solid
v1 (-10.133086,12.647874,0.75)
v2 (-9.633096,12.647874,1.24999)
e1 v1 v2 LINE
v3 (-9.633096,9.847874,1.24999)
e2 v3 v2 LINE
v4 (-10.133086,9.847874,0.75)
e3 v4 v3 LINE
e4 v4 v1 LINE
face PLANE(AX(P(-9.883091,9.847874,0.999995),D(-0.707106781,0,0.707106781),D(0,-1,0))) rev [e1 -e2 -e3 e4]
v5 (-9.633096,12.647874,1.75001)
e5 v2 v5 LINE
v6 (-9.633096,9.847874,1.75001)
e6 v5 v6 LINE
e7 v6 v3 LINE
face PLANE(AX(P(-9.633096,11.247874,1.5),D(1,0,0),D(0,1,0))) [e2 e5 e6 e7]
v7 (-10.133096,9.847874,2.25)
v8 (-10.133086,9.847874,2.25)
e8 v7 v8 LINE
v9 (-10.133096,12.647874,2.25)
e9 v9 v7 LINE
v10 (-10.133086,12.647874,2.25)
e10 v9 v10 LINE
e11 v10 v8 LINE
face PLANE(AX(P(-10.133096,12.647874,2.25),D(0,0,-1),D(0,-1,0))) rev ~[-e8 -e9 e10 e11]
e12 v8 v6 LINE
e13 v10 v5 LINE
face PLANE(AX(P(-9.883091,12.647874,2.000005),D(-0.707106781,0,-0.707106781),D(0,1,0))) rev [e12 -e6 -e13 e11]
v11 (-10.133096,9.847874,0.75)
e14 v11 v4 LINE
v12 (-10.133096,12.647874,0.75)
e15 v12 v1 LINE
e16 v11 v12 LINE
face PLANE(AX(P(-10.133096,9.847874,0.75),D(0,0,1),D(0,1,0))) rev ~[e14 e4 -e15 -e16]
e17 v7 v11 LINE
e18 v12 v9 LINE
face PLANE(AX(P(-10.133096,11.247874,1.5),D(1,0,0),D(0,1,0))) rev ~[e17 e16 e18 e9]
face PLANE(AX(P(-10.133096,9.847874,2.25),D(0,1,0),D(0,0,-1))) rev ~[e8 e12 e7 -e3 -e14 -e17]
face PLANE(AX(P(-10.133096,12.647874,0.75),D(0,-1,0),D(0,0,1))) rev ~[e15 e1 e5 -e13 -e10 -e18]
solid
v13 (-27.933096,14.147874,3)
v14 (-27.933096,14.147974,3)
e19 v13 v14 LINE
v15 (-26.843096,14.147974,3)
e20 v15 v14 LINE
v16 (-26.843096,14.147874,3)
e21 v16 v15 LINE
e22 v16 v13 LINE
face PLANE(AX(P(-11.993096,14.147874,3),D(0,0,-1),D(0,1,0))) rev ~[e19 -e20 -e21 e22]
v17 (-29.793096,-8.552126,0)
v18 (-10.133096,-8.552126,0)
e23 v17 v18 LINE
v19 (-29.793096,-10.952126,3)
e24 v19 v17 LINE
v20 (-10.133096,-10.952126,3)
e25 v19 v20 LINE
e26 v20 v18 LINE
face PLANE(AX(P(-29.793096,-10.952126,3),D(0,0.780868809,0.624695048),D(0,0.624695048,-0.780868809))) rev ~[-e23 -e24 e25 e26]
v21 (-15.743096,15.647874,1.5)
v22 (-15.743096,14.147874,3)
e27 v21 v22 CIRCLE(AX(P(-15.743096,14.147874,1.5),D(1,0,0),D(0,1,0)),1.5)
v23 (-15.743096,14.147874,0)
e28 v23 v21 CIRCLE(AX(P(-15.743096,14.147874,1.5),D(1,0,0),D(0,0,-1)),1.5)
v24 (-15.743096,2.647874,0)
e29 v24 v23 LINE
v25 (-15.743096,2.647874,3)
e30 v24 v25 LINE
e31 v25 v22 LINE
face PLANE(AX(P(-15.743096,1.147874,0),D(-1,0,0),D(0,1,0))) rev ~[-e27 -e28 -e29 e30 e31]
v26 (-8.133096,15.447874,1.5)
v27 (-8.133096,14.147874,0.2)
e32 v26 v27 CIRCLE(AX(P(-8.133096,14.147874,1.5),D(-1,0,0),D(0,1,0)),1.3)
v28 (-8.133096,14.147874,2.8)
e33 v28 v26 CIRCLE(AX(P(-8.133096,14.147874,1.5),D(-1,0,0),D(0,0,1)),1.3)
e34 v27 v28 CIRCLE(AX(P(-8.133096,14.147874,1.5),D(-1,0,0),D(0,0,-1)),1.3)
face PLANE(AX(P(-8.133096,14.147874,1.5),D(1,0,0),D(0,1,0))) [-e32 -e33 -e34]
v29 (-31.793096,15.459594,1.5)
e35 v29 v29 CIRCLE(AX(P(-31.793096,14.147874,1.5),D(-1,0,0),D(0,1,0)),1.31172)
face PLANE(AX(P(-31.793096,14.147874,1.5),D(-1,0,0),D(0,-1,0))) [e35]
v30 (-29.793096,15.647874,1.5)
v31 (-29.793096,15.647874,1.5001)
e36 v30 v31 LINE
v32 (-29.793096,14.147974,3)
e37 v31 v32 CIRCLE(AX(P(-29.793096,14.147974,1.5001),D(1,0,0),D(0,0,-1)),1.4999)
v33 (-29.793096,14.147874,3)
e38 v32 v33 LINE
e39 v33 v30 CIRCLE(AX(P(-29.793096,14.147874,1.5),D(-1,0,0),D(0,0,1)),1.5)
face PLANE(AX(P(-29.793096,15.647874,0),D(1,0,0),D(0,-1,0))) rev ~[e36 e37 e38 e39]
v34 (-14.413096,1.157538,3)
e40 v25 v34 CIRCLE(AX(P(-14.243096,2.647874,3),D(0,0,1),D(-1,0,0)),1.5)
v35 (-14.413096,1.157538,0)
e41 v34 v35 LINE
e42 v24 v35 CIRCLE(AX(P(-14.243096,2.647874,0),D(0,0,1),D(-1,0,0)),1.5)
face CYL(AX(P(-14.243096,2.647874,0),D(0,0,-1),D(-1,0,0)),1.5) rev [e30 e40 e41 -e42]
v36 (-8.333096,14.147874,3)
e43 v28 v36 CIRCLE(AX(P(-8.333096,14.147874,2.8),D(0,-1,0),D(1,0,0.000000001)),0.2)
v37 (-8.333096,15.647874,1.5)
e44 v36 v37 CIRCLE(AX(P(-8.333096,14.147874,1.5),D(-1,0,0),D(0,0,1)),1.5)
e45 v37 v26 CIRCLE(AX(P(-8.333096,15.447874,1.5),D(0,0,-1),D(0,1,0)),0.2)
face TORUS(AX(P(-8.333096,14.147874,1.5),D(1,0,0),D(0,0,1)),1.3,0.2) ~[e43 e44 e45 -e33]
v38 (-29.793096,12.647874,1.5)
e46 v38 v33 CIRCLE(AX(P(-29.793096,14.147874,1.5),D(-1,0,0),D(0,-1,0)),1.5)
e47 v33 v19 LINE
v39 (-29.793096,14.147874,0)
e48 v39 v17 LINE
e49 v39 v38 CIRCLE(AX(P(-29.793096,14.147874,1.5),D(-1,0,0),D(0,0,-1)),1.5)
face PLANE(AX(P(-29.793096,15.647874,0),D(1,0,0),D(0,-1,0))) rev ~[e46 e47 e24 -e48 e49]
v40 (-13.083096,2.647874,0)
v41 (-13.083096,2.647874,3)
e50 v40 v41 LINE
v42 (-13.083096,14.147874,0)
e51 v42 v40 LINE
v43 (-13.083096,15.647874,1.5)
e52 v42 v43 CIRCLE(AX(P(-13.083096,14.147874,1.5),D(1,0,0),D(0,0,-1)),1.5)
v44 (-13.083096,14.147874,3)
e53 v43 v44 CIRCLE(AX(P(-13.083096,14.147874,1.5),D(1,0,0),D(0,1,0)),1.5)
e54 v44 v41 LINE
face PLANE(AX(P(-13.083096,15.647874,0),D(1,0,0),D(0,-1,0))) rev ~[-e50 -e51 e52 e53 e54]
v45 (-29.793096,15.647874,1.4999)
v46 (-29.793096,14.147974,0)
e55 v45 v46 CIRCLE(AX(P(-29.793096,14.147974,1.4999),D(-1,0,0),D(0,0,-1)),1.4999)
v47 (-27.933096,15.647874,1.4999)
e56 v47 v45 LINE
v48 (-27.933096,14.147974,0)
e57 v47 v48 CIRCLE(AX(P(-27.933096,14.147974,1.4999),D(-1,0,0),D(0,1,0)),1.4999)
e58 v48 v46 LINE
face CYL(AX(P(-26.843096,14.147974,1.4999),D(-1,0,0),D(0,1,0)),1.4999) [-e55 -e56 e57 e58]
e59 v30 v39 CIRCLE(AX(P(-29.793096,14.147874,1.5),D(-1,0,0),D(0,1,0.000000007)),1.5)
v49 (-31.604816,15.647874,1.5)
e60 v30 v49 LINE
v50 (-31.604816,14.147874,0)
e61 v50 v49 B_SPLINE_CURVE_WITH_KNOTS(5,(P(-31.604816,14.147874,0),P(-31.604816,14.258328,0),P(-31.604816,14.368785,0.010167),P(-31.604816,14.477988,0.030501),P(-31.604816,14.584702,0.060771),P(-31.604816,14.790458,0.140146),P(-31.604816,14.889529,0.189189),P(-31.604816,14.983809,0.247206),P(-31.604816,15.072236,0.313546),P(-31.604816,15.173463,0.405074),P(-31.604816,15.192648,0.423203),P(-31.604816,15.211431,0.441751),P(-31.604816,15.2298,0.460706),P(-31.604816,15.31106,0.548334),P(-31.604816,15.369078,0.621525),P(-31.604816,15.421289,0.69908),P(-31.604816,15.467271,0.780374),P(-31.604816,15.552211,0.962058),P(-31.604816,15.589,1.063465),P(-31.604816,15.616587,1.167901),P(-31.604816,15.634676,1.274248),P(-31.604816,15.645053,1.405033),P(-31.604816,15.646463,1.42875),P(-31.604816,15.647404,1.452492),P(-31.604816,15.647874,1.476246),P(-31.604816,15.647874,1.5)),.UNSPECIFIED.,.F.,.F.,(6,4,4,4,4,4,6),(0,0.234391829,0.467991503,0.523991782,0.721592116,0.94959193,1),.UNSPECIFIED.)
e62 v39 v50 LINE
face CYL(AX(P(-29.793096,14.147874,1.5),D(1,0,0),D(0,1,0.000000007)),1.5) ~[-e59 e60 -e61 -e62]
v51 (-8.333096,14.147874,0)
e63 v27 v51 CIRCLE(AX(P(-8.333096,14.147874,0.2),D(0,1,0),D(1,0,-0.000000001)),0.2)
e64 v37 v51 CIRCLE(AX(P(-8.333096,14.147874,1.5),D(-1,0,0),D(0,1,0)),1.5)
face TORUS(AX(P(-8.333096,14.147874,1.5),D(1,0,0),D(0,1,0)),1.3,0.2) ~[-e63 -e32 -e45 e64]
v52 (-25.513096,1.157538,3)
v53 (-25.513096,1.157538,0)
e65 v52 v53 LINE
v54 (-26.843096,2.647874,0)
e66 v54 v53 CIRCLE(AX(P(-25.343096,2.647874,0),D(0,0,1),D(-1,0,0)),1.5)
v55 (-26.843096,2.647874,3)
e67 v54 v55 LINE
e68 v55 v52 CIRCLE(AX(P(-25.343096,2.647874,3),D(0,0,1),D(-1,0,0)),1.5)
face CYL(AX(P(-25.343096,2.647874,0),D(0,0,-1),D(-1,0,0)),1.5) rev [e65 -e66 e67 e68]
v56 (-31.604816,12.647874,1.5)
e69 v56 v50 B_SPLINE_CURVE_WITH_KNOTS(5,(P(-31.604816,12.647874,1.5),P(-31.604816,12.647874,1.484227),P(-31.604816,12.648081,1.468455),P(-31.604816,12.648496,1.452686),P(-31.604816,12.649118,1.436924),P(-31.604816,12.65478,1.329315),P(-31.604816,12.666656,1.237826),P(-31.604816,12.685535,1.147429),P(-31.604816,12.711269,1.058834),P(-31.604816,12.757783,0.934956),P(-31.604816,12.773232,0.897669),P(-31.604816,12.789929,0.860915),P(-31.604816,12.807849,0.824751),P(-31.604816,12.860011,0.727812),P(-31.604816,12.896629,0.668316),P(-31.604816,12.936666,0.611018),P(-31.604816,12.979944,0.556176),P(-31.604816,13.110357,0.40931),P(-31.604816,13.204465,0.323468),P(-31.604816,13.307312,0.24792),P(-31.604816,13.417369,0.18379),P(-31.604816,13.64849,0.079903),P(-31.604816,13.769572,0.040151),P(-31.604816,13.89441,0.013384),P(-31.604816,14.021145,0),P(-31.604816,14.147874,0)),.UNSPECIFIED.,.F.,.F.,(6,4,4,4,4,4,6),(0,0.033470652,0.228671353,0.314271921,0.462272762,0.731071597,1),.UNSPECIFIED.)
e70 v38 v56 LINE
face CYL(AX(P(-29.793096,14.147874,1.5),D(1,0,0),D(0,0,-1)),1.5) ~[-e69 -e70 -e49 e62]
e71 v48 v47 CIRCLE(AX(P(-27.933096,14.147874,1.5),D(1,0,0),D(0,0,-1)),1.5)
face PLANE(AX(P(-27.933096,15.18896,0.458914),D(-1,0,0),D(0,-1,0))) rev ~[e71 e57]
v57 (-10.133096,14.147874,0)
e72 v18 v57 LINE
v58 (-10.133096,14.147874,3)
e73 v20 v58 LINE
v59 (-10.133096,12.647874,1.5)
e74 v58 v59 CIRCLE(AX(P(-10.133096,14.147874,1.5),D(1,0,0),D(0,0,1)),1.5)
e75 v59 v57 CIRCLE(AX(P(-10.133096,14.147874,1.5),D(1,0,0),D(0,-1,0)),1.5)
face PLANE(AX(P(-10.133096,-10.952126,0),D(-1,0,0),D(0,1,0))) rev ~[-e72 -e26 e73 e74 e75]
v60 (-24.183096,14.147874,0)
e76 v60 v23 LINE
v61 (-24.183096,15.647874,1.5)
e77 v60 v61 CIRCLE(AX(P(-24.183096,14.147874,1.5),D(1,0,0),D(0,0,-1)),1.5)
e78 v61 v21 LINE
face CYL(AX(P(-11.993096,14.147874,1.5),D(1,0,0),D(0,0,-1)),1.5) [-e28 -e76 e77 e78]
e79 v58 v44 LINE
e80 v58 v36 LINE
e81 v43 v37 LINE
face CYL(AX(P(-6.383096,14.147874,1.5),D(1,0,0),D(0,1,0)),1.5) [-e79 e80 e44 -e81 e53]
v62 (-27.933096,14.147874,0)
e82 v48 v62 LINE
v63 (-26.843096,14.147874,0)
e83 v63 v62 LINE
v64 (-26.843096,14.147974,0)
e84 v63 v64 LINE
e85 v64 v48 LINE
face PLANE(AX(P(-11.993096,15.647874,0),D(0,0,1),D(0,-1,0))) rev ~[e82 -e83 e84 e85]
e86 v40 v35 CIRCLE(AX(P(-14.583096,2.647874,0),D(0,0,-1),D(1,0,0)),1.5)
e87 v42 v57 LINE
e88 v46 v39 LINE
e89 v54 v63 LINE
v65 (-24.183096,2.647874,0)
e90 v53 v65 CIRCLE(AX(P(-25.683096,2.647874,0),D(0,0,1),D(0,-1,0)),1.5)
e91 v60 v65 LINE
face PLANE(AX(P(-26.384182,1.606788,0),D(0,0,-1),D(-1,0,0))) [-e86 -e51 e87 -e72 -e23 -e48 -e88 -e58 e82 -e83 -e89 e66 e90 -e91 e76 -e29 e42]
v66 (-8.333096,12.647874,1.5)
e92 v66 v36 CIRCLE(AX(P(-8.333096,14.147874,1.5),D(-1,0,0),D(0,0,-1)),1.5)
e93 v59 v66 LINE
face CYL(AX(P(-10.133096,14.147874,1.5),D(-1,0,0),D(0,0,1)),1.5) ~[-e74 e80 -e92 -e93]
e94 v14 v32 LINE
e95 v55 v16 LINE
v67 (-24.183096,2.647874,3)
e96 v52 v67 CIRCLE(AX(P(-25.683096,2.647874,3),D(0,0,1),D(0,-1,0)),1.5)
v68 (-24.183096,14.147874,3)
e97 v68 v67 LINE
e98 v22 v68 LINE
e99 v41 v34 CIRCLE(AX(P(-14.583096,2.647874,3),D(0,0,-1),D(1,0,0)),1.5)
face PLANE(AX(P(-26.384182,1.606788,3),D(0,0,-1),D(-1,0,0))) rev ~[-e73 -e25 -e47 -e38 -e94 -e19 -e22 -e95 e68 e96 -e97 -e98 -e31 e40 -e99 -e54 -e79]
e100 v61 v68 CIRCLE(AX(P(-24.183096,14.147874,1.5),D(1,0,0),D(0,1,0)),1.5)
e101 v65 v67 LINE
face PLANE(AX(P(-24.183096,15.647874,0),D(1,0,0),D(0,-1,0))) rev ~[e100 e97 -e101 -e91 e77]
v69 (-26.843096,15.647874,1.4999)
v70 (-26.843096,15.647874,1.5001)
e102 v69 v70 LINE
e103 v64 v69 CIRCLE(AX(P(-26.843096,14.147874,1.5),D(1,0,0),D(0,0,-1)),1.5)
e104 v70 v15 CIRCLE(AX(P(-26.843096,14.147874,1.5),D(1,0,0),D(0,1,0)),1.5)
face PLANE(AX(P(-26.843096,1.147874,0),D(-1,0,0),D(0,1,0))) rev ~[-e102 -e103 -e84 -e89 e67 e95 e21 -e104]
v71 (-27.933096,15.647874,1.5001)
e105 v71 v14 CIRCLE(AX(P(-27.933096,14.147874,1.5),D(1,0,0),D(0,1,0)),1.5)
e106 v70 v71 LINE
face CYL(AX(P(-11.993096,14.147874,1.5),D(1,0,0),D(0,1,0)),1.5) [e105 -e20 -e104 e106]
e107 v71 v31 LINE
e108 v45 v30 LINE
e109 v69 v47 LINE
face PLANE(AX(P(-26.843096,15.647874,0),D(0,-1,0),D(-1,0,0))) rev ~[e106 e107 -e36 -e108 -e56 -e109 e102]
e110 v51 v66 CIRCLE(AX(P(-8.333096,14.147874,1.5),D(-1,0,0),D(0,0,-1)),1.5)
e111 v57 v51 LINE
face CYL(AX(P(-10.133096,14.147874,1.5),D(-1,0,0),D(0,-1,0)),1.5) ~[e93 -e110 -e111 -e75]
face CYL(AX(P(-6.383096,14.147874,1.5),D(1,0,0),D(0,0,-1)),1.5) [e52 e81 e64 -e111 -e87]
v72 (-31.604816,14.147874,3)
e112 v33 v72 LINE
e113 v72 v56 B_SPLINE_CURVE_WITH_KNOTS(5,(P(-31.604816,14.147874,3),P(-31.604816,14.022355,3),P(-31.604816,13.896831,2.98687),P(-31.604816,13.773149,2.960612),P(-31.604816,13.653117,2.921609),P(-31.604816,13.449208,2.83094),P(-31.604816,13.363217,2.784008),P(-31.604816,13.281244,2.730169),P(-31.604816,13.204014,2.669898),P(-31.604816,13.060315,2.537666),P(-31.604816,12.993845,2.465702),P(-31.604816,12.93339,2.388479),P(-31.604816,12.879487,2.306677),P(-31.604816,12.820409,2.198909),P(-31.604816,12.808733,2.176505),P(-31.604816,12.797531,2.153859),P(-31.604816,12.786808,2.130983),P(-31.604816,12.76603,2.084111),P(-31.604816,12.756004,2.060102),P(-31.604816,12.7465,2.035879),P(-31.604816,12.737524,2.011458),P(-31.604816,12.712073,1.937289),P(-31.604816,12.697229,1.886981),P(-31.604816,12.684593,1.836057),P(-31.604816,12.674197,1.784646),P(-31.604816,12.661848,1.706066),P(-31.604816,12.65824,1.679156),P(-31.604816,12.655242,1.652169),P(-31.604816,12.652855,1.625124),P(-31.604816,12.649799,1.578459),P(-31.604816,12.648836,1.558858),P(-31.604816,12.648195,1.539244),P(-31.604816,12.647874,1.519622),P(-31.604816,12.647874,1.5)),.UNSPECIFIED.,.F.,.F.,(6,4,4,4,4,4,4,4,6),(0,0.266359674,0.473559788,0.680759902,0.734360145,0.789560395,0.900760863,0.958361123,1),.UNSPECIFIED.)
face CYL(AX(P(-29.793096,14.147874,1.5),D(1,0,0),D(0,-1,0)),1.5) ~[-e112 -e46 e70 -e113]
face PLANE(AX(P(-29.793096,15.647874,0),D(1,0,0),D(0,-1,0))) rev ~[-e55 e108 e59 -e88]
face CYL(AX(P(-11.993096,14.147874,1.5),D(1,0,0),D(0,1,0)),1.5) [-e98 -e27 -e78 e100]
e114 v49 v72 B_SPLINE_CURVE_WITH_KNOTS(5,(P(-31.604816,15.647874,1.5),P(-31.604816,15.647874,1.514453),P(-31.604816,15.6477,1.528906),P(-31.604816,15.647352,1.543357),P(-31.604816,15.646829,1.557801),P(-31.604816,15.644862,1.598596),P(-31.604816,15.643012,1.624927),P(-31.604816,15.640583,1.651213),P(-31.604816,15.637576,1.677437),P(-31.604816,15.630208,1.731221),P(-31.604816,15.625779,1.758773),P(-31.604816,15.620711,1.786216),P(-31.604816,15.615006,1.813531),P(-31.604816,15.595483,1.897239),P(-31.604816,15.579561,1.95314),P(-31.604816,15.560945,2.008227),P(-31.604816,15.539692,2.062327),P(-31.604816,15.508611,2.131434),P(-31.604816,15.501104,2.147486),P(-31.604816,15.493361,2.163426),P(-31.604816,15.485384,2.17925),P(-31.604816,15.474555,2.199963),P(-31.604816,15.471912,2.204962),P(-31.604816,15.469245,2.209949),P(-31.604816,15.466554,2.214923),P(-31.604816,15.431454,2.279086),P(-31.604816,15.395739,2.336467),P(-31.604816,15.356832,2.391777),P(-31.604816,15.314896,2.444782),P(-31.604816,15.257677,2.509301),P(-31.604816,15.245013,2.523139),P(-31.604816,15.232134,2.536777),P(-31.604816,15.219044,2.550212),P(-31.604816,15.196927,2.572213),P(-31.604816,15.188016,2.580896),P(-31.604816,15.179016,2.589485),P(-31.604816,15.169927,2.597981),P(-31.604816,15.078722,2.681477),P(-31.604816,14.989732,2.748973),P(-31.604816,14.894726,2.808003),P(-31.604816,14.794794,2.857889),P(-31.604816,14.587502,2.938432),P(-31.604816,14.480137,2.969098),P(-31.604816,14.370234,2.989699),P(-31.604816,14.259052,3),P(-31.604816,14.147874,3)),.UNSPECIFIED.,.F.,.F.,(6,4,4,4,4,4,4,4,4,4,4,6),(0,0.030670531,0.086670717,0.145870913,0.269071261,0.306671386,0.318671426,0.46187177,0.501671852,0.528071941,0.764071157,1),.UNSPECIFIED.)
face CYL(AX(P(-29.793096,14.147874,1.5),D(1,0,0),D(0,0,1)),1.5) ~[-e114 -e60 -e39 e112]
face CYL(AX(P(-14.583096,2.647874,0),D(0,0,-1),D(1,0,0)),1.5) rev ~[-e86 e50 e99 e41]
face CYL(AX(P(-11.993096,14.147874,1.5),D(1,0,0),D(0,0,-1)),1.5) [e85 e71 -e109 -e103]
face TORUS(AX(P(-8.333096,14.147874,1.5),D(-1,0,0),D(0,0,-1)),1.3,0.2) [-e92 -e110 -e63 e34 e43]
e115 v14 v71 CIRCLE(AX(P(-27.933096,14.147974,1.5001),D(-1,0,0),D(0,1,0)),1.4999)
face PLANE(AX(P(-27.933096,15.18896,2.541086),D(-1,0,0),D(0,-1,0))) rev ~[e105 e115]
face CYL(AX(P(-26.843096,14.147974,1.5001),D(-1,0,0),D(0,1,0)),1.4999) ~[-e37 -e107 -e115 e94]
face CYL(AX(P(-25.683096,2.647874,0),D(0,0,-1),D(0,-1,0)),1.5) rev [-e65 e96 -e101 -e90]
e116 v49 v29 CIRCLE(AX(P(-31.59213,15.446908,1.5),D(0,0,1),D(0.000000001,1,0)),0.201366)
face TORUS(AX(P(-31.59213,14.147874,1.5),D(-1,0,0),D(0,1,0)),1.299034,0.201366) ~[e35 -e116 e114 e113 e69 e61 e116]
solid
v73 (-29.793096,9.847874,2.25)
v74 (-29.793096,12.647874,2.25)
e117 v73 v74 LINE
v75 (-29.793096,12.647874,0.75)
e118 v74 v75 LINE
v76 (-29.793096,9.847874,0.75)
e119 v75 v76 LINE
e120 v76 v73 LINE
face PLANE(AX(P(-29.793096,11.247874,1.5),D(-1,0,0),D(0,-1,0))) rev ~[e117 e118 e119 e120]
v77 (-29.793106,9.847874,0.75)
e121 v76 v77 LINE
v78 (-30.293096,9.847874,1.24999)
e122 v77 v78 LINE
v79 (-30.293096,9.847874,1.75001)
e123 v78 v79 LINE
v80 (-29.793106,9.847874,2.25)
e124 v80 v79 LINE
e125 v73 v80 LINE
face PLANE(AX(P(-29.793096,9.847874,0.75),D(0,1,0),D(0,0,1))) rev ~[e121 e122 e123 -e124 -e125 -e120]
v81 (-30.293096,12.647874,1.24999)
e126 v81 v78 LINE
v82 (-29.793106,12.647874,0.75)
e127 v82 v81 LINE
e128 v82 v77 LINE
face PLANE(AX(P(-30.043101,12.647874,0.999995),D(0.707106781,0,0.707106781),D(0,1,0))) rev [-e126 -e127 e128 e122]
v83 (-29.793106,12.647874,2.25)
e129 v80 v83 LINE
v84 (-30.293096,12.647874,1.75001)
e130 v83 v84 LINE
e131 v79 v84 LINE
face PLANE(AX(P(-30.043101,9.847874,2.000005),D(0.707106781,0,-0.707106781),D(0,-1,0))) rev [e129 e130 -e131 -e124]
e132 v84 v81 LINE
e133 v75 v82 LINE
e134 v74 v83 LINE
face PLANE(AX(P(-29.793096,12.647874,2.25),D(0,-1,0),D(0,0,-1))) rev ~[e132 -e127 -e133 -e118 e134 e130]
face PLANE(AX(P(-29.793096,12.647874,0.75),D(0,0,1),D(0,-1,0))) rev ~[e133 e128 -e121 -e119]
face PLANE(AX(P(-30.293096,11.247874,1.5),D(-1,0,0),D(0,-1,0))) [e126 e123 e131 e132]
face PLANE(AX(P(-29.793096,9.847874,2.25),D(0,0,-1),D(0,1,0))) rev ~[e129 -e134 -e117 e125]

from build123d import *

# Parameters (mm, degrees)
F1_DEPTH      = 3
F3_DEPTH      = 2
F5_DEPTH      = 2
F6_DEPTH      = 0.5
F7_SIZE       = 0.49999
F8_DEPTH      = 0.5
F9_SIZE       = 0.49999
F10_DEPTH     = 19.66
F11_R         = 1.4999
F12_T3_DEPTH  = 3
F12_T6_DEPTH  = 3
F12_T9_DEPTH  = 3
F12_T12_DEPTH = 3
F12_T16_DEPTH = 15.94
F12_T19_DEPTH = 10.45
F12_T22_DEPTH = 15.94
F12_T25_DEPTH = 10.45
F14_T3_ANGLE  = 179.9999999988
F14_T6_ANGLE  = 90
F14_T9_ANGLE  = 90.0000000012


# Not quite as in the source:
# - a fillet or chamfer that OpenCascade refuses, or shapes differently, is made with other operations: its cross-section is extruded or revolved along the edge and cut away or added
# - two fillets or chamfers of one size are made in one step
# - a fillet or chamfer is up to 0.001 mm smaller than in the source, because OpenCascade refuses the exact size


with BuildPart() as f1:
    # F0 (on Top) → F1 (new body)
    with BuildSketch(Plane.XY):
        Polygon((-26.8430960169, 15.6478737652), (-29.7930960169, 15.6478737652), (-29.7930960169, -10.9521262348), (-10.1330960169, -10.9521262348), (-10.1330960169, 15.6478737652), (-13.0830960169, 15.6478737652), (-13.0830960169, 1.1478737652), (-15.7430960169, 1.1478737652), (-15.7430960169, 15.6478737652), (-24.1830960169, 15.6478737652), (-24.1830960169, 1.1478737652), (-26.8430960169, 1.1478737652), align=None)
    extrude(amount=F1_DEPTH)

    # F2 (on face) → F3 (join)
    with BuildSketch(Plane.YZ.offset(-10.1330960169)):
        with BuildLine():
            ThreePointArc((14.1478737652, 0), (15.208533937, 0.4393398282), (15.6478737652, 1.5))
            ThreePointArc((15.6478737652, 1.5), (15.208533937, 2.5606601718), (14.1478737652, 3))
            ThreePointArc((14.1478737652, 3), (13.0872135935, 2.5606601718), (12.6478737652, 1.5))
            ThreePointArc((12.6478737652, 1.5), (13.0872135935, 0.4393398282), (14.1478737652, 0))
        make_face()
    extrude(amount=F3_DEPTH)

    # F4 (on face) → F5 (join)
    with BuildSketch(Plane(origin=(-29.7930960169, 0, 0), x_dir=(0, -1, 0), z_dir=(-1, 0, 0))):
        with BuildLine():
            ThreePointArc((-14.1478737652, 0), (-13.0872135935, 0.4393398282), (-12.6478737652, 1.5))
            ThreePointArc((-12.6478737652, 1.5), (-13.0872135935, 2.5606601718), (-14.1478737652, 3))
            ThreePointArc((-14.1478737652, 3), (-15.2085339334, 2.5606601754), (-15.6478737652, 1.5000000103))
            ThreePointArc((-15.6478737652, 1.5000000103), (-15.2085339407, 0.4393398319), (-14.1478737652, 0))
        make_face()
    extrude(amount=F5_DEPTH)

    # F4 (on face) → F10 (cut, through all)
    with BuildSketch(Plane(origin=(-29.7930960169, 0, 0), x_dir=(0, -1, 0), z_dir=(-1, 0, 0))):
        Polygon((10.9521262348, 0), (10.9521262348, 3), (8.5521262348, 0), align=None)
    extrude(amount=-F10_DEPTH, mode=Mode.SUBTRACT)

    # F11 (radius 1.5 in the source; OpenCascade refuses exactly that, so slightly less here)
    f11_edges = [f1.edges().sort_by_distance(p)[0] for p in [
        (-28.318096, 15.647874, 3),
        (-28.318096, 15.647874, 0),
    ]]
    fillet(f11_edges, radius=F11_R)

    # F12: fillet of radius 1.5 on 8 edges, made by hand


with BuildPart() as f6:
    # F4 (on face) → F6 (new body)
    with BuildSketch(Plane(origin=(-29.7930960169, 0, 0), x_dir=(0, -1, 0), z_dir=(-1, 0, 0))):
        Polygon((-12.6478737652, 2.25), (-12.6478737652, 1.5), (-12.6478737652, 0.75), (-9.8478737652, 0.75), (-9.8478737652, 1.5), (-9.8478737652, 2.25), align=None)
    extrude(amount=F6_DEPTH)

    # F7 (size 0.5 in the source; OpenCascade refuses exactly that, so slightly less here)
    f7_edges = [f6.edges().sort_by_distance(p)[0] for p in [
        (-30.293096, 11.247874, 0.75),
        (-30.293096, 11.247874, 2.25),
    ]]
    chamfer(f7_edges, length=F7_SIZE)


with BuildPart() as f8:
    # F2 (on face) → F8 (new body)
    with BuildSketch(Plane.YZ.offset(-10.1330960169)):
        Polygon((12.6478737652, 0.75), (12.6478737652, 1.5), (12.6478737652, 2.25), (9.8478737652, 2.25), (9.8478737652, 0.75), align=None)
    extrude(amount=F8_DEPTH)

    # F9 (size 0.5 in the source; OpenCascade refuses exactly that, so slightly less here)
    f9_edges = [f8.edges().sort_by_distance(p)[0] for p in [
        (-9.633096, 11.247874, 2.25),
        (-9.633096, 11.247874, 0.75),
    ]]
    chamfer(f9_edges, length=F9_SIZE)


with BuildPart() as f12_tool1:
    # F12_s2 → F12_t3 (new body)
    with BuildSketch(Plane.XY):
        with BuildLine():
            ThreePointArc((-26.8430960169, 2.6478737652), (-26.4037561887, 1.5872135935), (-25.3430960169, 1.1478737652))
            Line((-25.3430960169, 1.1478737652), (-26.8430960169, 1.1478737652))
            Line((-26.8430960169, 1.1478737652), (-26.8430960169, 2.6478737652))
        make_face()
    extrude(amount=F12_T3_DEPTH)


with BuildPart() as f12_tool4:
    # F12_s5 → F12_t6 (new body)
    with BuildSketch(Plane.XY):
        with BuildLine():
            ThreePointArc((-25.6830960169, 1.1478737652), (-24.6224358452, 1.5872135935), (-24.1830960169, 2.6478737652))
            Line((-24.1830960169, 2.6478737652), (-24.1830960169, 1.1478737652))
            Line((-24.1830960169, 1.1478737652), (-25.6830960169, 1.1478737652))
        make_face()
    extrude(amount=F12_T6_DEPTH)


with BuildPart() as f12_tool7:
    # F12_s8 → F12_t9 (new body)
    with BuildSketch(Plane.XY):
        with BuildLine():
            ThreePointArc((-15.7430960169, 2.6478737652), (-15.3037561887, 1.5872135935), (-14.2430960169, 1.1478737652))
            Line((-14.2430960169, 1.1478737652), (-15.7430960169, 1.1478737652))
            Line((-15.7430960169, 1.1478737652), (-15.7430960169, 2.6478737652))
        make_face()
    extrude(amount=F12_T9_DEPTH)


with BuildPart() as f12_tool10:
    # F12_s11 → F12_t12 (new body)
    with BuildSketch(Plane.XY):
        with BuildLine():
            ThreePointArc((-13.0830960169, 2.6478737652), (-13.5224358452, 1.5872135935), (-14.5830960169, 1.1478737652))
            Line((-14.5830960169, 1.1478737652), (-13.0830960169, 1.1478737652))
            Line((-13.0830960169, 1.1478737652), (-13.0830960169, 2.6478737652))
        make_face()
    extrude(amount=F12_T12_DEPTH)


with BuildPart() as f1_1:
    add(f1.part)

    # F12_t13: union F12_tool1, F12_tool4, F12_tool7, F12_tool10
    add([f12_tool1.part, f12_tool4.part, f12_tool7.part, f12_tool10.part])


with BuildPart() as f12_tool14:
    # F12_s15 → F12_t16 (new body)
    with BuildSketch(Plane.YZ.offset(-11.9930960169)):
        with BuildLine():
            ThreePointArc((14.1478737652, 0), (15.208533937, 0.4393398282), (15.6478737652, 1.5))
            Line((15.6478737652, 1.5), (15.6478737652, 0))
            Line((15.6478737652, 0), (14.1478737652, 0))
        make_face()
    extrude(amount=-F12_T16_DEPTH)


with BuildPart() as f12_tool17:
    # F12_s18 → F12_t19 (new body)
    with BuildSketch(Plane.YZ.offset(-6.3830960169)):
        with BuildLine():
            ThreePointArc((14.1478737652, 0), (15.208533937, 0.4393398282), (15.6478737652, 1.5))
            Line((15.6478737652, 1.5), (15.6478737652, 0))
            Line((15.6478737652, 0), (14.1478737652, 0))
        make_face()
    extrude(amount=-F12_T19_DEPTH)


with BuildPart() as f12_tool20:
    # F12_s21 → F12_t22 (new body)
    with BuildSketch(Plane.YZ.offset(-11.9930960169)):
        with BuildLine():
            ThreePointArc((15.6478737652, 1.5), (15.208533937, 2.5606601718), (14.1478737652, 3))
            Line((14.1478737652, 3), (15.6478737652, 3))
            Line((15.6478737652, 3), (15.6478737652, 1.5))
        make_face()
    extrude(amount=-F12_T22_DEPTH)


with BuildPart() as f12_tool23:
    # F12_s24 → F12_t25 (new body)
    with BuildSketch(Plane.YZ.offset(-6.3830960169)):
        with BuildLine():
            ThreePointArc((15.6478737652, 1.5), (15.208533937, 2.5606601718), (14.1478737652, 3))
            Line((14.1478737652, 3), (15.6478737652, 3))
            Line((15.6478737652, 3), (15.6478737652, 1.5))
        make_face()
    extrude(amount=-F12_T25_DEPTH)


with BuildPart() as f1_2:
    add(f1_1.part)

    # F12_t26: cut F12_tool14, F12_tool17, F12_tool20, F12_tool23
    add([f12_tool14.part, f12_tool17.part, f12_tool20.part, f12_tool23.part], mode=Mode.SUBTRACT)

    # F14: fillet of radius 0.2 on 1 edges, made by hand


with BuildPart() as f14_tool1:
    # F14_s2 → F14_t3 (revolve)
    with BuildSketch(Plane.XZ.offset(-14.1478737652)):
        with BuildLine():
            ThreePointArc((-8.1330960169, 0.2), (-8.1916746607, 0.0585786438), (-8.3330960169, 0))
            Line((-8.3330960169, 0), (-8.1330960169, 0))
            Line((-8.1330960169, 0), (-8.1330960169, 0.2))
        make_face()
    revolve(axis=Axis((-8.1330960169, 14.1478737652, 1.5), (-1, 0, 0)), revolution_arc=F14_T3_ANGLE)


with BuildPart() as f14_tool4:
    # F14_s5 → F14_t6 (revolve)
    with BuildSketch(Plane.XY.offset(1.5)):
        with BuildLine():
            ThreePointArc((-8.3330960169, 15.6478737652), (-8.1916746607, 15.5892951215), (-8.1330960169, 15.4478737652))
            Line((-8.1330960169, 15.4478737652), (-8.1330960169, 15.6478737652))
            Line((-8.1330960169, 15.6478737652), (-8.3330960169, 15.6478737652))
        make_face()
    revolve(axis=Axis((-8.1330960169, 14.1478737652, 1.5), (-1, 0, 0)), revolution_arc=F14_T6_ANGLE)


with BuildPart() as f14_tool7:
    # F14_s8 → F14_t9 (revolve)
    with BuildSketch(Plane.XZ.offset(-14.1478737652)):
        with BuildLine():
            ThreePointArc((-8.3330960169, 3), (-8.1916746607, 2.9414213562), (-8.1330960169, 2.8))
            Line((-8.1330960169, 2.8), (-8.1330960169, 3))
            Line((-8.1330960169, 3), (-8.3330960169, 3))
        make_face()
    revolve(axis=Axis((-8.1330960169, 14.1478737652, 1.5), (-1, 0, 0)), revolution_arc=F14_T9_ANGLE)


with BuildPart() as f1_3:
    add(f1_2.part)

    # F14_t10: cut F14_tool1, F14_tool4, F14_tool7
    add([f14_tool1.part, f14_tool4.part, f14_tool7.part], mode=Mode.SUBTRACT)

    # F15: fillet of radius 0.2 on 1 edges, made by hand

    # F15_s1 → F15_t2 (revolve, cut)
    with BuildSketch(Plane.XY.offset(1.5)):
        with BuildLine():
            ThreePointArc((-31.5921303315, 15.6482737652), (-31.7345173732, 15.5892951215), (-31.7934960169, 15.4469080798))
            Line((-31.7934960169, 15.4469080798), (-31.8136325855, 15.4469080798))
            ThreePointArc((-31.8136325855, 15.4469080798), (-31.8132325855, 15.5473909225), (-31.8132325855, 15.6478737652))
            Line((-31.8132325855, 15.6478737652), (-31.7930960169, 15.6680103338))
            ThreePointArc((-31.7930960169, 15.6680103338), (-31.6926131742, 15.6680103338), (-31.5921303315, 15.6684103338))
            Line((-31.5921303315, 15.6684103338), (-31.5921303315, 15.6482737652))
        make_face()
    revolve(axis=Axis((-31.7930960169, 14.1478737652, 1.5), (1, 0, 0)), mode=Mode.SUBTRACT)


solid = Compound([f6.part, f8.part, f1_3.part])
